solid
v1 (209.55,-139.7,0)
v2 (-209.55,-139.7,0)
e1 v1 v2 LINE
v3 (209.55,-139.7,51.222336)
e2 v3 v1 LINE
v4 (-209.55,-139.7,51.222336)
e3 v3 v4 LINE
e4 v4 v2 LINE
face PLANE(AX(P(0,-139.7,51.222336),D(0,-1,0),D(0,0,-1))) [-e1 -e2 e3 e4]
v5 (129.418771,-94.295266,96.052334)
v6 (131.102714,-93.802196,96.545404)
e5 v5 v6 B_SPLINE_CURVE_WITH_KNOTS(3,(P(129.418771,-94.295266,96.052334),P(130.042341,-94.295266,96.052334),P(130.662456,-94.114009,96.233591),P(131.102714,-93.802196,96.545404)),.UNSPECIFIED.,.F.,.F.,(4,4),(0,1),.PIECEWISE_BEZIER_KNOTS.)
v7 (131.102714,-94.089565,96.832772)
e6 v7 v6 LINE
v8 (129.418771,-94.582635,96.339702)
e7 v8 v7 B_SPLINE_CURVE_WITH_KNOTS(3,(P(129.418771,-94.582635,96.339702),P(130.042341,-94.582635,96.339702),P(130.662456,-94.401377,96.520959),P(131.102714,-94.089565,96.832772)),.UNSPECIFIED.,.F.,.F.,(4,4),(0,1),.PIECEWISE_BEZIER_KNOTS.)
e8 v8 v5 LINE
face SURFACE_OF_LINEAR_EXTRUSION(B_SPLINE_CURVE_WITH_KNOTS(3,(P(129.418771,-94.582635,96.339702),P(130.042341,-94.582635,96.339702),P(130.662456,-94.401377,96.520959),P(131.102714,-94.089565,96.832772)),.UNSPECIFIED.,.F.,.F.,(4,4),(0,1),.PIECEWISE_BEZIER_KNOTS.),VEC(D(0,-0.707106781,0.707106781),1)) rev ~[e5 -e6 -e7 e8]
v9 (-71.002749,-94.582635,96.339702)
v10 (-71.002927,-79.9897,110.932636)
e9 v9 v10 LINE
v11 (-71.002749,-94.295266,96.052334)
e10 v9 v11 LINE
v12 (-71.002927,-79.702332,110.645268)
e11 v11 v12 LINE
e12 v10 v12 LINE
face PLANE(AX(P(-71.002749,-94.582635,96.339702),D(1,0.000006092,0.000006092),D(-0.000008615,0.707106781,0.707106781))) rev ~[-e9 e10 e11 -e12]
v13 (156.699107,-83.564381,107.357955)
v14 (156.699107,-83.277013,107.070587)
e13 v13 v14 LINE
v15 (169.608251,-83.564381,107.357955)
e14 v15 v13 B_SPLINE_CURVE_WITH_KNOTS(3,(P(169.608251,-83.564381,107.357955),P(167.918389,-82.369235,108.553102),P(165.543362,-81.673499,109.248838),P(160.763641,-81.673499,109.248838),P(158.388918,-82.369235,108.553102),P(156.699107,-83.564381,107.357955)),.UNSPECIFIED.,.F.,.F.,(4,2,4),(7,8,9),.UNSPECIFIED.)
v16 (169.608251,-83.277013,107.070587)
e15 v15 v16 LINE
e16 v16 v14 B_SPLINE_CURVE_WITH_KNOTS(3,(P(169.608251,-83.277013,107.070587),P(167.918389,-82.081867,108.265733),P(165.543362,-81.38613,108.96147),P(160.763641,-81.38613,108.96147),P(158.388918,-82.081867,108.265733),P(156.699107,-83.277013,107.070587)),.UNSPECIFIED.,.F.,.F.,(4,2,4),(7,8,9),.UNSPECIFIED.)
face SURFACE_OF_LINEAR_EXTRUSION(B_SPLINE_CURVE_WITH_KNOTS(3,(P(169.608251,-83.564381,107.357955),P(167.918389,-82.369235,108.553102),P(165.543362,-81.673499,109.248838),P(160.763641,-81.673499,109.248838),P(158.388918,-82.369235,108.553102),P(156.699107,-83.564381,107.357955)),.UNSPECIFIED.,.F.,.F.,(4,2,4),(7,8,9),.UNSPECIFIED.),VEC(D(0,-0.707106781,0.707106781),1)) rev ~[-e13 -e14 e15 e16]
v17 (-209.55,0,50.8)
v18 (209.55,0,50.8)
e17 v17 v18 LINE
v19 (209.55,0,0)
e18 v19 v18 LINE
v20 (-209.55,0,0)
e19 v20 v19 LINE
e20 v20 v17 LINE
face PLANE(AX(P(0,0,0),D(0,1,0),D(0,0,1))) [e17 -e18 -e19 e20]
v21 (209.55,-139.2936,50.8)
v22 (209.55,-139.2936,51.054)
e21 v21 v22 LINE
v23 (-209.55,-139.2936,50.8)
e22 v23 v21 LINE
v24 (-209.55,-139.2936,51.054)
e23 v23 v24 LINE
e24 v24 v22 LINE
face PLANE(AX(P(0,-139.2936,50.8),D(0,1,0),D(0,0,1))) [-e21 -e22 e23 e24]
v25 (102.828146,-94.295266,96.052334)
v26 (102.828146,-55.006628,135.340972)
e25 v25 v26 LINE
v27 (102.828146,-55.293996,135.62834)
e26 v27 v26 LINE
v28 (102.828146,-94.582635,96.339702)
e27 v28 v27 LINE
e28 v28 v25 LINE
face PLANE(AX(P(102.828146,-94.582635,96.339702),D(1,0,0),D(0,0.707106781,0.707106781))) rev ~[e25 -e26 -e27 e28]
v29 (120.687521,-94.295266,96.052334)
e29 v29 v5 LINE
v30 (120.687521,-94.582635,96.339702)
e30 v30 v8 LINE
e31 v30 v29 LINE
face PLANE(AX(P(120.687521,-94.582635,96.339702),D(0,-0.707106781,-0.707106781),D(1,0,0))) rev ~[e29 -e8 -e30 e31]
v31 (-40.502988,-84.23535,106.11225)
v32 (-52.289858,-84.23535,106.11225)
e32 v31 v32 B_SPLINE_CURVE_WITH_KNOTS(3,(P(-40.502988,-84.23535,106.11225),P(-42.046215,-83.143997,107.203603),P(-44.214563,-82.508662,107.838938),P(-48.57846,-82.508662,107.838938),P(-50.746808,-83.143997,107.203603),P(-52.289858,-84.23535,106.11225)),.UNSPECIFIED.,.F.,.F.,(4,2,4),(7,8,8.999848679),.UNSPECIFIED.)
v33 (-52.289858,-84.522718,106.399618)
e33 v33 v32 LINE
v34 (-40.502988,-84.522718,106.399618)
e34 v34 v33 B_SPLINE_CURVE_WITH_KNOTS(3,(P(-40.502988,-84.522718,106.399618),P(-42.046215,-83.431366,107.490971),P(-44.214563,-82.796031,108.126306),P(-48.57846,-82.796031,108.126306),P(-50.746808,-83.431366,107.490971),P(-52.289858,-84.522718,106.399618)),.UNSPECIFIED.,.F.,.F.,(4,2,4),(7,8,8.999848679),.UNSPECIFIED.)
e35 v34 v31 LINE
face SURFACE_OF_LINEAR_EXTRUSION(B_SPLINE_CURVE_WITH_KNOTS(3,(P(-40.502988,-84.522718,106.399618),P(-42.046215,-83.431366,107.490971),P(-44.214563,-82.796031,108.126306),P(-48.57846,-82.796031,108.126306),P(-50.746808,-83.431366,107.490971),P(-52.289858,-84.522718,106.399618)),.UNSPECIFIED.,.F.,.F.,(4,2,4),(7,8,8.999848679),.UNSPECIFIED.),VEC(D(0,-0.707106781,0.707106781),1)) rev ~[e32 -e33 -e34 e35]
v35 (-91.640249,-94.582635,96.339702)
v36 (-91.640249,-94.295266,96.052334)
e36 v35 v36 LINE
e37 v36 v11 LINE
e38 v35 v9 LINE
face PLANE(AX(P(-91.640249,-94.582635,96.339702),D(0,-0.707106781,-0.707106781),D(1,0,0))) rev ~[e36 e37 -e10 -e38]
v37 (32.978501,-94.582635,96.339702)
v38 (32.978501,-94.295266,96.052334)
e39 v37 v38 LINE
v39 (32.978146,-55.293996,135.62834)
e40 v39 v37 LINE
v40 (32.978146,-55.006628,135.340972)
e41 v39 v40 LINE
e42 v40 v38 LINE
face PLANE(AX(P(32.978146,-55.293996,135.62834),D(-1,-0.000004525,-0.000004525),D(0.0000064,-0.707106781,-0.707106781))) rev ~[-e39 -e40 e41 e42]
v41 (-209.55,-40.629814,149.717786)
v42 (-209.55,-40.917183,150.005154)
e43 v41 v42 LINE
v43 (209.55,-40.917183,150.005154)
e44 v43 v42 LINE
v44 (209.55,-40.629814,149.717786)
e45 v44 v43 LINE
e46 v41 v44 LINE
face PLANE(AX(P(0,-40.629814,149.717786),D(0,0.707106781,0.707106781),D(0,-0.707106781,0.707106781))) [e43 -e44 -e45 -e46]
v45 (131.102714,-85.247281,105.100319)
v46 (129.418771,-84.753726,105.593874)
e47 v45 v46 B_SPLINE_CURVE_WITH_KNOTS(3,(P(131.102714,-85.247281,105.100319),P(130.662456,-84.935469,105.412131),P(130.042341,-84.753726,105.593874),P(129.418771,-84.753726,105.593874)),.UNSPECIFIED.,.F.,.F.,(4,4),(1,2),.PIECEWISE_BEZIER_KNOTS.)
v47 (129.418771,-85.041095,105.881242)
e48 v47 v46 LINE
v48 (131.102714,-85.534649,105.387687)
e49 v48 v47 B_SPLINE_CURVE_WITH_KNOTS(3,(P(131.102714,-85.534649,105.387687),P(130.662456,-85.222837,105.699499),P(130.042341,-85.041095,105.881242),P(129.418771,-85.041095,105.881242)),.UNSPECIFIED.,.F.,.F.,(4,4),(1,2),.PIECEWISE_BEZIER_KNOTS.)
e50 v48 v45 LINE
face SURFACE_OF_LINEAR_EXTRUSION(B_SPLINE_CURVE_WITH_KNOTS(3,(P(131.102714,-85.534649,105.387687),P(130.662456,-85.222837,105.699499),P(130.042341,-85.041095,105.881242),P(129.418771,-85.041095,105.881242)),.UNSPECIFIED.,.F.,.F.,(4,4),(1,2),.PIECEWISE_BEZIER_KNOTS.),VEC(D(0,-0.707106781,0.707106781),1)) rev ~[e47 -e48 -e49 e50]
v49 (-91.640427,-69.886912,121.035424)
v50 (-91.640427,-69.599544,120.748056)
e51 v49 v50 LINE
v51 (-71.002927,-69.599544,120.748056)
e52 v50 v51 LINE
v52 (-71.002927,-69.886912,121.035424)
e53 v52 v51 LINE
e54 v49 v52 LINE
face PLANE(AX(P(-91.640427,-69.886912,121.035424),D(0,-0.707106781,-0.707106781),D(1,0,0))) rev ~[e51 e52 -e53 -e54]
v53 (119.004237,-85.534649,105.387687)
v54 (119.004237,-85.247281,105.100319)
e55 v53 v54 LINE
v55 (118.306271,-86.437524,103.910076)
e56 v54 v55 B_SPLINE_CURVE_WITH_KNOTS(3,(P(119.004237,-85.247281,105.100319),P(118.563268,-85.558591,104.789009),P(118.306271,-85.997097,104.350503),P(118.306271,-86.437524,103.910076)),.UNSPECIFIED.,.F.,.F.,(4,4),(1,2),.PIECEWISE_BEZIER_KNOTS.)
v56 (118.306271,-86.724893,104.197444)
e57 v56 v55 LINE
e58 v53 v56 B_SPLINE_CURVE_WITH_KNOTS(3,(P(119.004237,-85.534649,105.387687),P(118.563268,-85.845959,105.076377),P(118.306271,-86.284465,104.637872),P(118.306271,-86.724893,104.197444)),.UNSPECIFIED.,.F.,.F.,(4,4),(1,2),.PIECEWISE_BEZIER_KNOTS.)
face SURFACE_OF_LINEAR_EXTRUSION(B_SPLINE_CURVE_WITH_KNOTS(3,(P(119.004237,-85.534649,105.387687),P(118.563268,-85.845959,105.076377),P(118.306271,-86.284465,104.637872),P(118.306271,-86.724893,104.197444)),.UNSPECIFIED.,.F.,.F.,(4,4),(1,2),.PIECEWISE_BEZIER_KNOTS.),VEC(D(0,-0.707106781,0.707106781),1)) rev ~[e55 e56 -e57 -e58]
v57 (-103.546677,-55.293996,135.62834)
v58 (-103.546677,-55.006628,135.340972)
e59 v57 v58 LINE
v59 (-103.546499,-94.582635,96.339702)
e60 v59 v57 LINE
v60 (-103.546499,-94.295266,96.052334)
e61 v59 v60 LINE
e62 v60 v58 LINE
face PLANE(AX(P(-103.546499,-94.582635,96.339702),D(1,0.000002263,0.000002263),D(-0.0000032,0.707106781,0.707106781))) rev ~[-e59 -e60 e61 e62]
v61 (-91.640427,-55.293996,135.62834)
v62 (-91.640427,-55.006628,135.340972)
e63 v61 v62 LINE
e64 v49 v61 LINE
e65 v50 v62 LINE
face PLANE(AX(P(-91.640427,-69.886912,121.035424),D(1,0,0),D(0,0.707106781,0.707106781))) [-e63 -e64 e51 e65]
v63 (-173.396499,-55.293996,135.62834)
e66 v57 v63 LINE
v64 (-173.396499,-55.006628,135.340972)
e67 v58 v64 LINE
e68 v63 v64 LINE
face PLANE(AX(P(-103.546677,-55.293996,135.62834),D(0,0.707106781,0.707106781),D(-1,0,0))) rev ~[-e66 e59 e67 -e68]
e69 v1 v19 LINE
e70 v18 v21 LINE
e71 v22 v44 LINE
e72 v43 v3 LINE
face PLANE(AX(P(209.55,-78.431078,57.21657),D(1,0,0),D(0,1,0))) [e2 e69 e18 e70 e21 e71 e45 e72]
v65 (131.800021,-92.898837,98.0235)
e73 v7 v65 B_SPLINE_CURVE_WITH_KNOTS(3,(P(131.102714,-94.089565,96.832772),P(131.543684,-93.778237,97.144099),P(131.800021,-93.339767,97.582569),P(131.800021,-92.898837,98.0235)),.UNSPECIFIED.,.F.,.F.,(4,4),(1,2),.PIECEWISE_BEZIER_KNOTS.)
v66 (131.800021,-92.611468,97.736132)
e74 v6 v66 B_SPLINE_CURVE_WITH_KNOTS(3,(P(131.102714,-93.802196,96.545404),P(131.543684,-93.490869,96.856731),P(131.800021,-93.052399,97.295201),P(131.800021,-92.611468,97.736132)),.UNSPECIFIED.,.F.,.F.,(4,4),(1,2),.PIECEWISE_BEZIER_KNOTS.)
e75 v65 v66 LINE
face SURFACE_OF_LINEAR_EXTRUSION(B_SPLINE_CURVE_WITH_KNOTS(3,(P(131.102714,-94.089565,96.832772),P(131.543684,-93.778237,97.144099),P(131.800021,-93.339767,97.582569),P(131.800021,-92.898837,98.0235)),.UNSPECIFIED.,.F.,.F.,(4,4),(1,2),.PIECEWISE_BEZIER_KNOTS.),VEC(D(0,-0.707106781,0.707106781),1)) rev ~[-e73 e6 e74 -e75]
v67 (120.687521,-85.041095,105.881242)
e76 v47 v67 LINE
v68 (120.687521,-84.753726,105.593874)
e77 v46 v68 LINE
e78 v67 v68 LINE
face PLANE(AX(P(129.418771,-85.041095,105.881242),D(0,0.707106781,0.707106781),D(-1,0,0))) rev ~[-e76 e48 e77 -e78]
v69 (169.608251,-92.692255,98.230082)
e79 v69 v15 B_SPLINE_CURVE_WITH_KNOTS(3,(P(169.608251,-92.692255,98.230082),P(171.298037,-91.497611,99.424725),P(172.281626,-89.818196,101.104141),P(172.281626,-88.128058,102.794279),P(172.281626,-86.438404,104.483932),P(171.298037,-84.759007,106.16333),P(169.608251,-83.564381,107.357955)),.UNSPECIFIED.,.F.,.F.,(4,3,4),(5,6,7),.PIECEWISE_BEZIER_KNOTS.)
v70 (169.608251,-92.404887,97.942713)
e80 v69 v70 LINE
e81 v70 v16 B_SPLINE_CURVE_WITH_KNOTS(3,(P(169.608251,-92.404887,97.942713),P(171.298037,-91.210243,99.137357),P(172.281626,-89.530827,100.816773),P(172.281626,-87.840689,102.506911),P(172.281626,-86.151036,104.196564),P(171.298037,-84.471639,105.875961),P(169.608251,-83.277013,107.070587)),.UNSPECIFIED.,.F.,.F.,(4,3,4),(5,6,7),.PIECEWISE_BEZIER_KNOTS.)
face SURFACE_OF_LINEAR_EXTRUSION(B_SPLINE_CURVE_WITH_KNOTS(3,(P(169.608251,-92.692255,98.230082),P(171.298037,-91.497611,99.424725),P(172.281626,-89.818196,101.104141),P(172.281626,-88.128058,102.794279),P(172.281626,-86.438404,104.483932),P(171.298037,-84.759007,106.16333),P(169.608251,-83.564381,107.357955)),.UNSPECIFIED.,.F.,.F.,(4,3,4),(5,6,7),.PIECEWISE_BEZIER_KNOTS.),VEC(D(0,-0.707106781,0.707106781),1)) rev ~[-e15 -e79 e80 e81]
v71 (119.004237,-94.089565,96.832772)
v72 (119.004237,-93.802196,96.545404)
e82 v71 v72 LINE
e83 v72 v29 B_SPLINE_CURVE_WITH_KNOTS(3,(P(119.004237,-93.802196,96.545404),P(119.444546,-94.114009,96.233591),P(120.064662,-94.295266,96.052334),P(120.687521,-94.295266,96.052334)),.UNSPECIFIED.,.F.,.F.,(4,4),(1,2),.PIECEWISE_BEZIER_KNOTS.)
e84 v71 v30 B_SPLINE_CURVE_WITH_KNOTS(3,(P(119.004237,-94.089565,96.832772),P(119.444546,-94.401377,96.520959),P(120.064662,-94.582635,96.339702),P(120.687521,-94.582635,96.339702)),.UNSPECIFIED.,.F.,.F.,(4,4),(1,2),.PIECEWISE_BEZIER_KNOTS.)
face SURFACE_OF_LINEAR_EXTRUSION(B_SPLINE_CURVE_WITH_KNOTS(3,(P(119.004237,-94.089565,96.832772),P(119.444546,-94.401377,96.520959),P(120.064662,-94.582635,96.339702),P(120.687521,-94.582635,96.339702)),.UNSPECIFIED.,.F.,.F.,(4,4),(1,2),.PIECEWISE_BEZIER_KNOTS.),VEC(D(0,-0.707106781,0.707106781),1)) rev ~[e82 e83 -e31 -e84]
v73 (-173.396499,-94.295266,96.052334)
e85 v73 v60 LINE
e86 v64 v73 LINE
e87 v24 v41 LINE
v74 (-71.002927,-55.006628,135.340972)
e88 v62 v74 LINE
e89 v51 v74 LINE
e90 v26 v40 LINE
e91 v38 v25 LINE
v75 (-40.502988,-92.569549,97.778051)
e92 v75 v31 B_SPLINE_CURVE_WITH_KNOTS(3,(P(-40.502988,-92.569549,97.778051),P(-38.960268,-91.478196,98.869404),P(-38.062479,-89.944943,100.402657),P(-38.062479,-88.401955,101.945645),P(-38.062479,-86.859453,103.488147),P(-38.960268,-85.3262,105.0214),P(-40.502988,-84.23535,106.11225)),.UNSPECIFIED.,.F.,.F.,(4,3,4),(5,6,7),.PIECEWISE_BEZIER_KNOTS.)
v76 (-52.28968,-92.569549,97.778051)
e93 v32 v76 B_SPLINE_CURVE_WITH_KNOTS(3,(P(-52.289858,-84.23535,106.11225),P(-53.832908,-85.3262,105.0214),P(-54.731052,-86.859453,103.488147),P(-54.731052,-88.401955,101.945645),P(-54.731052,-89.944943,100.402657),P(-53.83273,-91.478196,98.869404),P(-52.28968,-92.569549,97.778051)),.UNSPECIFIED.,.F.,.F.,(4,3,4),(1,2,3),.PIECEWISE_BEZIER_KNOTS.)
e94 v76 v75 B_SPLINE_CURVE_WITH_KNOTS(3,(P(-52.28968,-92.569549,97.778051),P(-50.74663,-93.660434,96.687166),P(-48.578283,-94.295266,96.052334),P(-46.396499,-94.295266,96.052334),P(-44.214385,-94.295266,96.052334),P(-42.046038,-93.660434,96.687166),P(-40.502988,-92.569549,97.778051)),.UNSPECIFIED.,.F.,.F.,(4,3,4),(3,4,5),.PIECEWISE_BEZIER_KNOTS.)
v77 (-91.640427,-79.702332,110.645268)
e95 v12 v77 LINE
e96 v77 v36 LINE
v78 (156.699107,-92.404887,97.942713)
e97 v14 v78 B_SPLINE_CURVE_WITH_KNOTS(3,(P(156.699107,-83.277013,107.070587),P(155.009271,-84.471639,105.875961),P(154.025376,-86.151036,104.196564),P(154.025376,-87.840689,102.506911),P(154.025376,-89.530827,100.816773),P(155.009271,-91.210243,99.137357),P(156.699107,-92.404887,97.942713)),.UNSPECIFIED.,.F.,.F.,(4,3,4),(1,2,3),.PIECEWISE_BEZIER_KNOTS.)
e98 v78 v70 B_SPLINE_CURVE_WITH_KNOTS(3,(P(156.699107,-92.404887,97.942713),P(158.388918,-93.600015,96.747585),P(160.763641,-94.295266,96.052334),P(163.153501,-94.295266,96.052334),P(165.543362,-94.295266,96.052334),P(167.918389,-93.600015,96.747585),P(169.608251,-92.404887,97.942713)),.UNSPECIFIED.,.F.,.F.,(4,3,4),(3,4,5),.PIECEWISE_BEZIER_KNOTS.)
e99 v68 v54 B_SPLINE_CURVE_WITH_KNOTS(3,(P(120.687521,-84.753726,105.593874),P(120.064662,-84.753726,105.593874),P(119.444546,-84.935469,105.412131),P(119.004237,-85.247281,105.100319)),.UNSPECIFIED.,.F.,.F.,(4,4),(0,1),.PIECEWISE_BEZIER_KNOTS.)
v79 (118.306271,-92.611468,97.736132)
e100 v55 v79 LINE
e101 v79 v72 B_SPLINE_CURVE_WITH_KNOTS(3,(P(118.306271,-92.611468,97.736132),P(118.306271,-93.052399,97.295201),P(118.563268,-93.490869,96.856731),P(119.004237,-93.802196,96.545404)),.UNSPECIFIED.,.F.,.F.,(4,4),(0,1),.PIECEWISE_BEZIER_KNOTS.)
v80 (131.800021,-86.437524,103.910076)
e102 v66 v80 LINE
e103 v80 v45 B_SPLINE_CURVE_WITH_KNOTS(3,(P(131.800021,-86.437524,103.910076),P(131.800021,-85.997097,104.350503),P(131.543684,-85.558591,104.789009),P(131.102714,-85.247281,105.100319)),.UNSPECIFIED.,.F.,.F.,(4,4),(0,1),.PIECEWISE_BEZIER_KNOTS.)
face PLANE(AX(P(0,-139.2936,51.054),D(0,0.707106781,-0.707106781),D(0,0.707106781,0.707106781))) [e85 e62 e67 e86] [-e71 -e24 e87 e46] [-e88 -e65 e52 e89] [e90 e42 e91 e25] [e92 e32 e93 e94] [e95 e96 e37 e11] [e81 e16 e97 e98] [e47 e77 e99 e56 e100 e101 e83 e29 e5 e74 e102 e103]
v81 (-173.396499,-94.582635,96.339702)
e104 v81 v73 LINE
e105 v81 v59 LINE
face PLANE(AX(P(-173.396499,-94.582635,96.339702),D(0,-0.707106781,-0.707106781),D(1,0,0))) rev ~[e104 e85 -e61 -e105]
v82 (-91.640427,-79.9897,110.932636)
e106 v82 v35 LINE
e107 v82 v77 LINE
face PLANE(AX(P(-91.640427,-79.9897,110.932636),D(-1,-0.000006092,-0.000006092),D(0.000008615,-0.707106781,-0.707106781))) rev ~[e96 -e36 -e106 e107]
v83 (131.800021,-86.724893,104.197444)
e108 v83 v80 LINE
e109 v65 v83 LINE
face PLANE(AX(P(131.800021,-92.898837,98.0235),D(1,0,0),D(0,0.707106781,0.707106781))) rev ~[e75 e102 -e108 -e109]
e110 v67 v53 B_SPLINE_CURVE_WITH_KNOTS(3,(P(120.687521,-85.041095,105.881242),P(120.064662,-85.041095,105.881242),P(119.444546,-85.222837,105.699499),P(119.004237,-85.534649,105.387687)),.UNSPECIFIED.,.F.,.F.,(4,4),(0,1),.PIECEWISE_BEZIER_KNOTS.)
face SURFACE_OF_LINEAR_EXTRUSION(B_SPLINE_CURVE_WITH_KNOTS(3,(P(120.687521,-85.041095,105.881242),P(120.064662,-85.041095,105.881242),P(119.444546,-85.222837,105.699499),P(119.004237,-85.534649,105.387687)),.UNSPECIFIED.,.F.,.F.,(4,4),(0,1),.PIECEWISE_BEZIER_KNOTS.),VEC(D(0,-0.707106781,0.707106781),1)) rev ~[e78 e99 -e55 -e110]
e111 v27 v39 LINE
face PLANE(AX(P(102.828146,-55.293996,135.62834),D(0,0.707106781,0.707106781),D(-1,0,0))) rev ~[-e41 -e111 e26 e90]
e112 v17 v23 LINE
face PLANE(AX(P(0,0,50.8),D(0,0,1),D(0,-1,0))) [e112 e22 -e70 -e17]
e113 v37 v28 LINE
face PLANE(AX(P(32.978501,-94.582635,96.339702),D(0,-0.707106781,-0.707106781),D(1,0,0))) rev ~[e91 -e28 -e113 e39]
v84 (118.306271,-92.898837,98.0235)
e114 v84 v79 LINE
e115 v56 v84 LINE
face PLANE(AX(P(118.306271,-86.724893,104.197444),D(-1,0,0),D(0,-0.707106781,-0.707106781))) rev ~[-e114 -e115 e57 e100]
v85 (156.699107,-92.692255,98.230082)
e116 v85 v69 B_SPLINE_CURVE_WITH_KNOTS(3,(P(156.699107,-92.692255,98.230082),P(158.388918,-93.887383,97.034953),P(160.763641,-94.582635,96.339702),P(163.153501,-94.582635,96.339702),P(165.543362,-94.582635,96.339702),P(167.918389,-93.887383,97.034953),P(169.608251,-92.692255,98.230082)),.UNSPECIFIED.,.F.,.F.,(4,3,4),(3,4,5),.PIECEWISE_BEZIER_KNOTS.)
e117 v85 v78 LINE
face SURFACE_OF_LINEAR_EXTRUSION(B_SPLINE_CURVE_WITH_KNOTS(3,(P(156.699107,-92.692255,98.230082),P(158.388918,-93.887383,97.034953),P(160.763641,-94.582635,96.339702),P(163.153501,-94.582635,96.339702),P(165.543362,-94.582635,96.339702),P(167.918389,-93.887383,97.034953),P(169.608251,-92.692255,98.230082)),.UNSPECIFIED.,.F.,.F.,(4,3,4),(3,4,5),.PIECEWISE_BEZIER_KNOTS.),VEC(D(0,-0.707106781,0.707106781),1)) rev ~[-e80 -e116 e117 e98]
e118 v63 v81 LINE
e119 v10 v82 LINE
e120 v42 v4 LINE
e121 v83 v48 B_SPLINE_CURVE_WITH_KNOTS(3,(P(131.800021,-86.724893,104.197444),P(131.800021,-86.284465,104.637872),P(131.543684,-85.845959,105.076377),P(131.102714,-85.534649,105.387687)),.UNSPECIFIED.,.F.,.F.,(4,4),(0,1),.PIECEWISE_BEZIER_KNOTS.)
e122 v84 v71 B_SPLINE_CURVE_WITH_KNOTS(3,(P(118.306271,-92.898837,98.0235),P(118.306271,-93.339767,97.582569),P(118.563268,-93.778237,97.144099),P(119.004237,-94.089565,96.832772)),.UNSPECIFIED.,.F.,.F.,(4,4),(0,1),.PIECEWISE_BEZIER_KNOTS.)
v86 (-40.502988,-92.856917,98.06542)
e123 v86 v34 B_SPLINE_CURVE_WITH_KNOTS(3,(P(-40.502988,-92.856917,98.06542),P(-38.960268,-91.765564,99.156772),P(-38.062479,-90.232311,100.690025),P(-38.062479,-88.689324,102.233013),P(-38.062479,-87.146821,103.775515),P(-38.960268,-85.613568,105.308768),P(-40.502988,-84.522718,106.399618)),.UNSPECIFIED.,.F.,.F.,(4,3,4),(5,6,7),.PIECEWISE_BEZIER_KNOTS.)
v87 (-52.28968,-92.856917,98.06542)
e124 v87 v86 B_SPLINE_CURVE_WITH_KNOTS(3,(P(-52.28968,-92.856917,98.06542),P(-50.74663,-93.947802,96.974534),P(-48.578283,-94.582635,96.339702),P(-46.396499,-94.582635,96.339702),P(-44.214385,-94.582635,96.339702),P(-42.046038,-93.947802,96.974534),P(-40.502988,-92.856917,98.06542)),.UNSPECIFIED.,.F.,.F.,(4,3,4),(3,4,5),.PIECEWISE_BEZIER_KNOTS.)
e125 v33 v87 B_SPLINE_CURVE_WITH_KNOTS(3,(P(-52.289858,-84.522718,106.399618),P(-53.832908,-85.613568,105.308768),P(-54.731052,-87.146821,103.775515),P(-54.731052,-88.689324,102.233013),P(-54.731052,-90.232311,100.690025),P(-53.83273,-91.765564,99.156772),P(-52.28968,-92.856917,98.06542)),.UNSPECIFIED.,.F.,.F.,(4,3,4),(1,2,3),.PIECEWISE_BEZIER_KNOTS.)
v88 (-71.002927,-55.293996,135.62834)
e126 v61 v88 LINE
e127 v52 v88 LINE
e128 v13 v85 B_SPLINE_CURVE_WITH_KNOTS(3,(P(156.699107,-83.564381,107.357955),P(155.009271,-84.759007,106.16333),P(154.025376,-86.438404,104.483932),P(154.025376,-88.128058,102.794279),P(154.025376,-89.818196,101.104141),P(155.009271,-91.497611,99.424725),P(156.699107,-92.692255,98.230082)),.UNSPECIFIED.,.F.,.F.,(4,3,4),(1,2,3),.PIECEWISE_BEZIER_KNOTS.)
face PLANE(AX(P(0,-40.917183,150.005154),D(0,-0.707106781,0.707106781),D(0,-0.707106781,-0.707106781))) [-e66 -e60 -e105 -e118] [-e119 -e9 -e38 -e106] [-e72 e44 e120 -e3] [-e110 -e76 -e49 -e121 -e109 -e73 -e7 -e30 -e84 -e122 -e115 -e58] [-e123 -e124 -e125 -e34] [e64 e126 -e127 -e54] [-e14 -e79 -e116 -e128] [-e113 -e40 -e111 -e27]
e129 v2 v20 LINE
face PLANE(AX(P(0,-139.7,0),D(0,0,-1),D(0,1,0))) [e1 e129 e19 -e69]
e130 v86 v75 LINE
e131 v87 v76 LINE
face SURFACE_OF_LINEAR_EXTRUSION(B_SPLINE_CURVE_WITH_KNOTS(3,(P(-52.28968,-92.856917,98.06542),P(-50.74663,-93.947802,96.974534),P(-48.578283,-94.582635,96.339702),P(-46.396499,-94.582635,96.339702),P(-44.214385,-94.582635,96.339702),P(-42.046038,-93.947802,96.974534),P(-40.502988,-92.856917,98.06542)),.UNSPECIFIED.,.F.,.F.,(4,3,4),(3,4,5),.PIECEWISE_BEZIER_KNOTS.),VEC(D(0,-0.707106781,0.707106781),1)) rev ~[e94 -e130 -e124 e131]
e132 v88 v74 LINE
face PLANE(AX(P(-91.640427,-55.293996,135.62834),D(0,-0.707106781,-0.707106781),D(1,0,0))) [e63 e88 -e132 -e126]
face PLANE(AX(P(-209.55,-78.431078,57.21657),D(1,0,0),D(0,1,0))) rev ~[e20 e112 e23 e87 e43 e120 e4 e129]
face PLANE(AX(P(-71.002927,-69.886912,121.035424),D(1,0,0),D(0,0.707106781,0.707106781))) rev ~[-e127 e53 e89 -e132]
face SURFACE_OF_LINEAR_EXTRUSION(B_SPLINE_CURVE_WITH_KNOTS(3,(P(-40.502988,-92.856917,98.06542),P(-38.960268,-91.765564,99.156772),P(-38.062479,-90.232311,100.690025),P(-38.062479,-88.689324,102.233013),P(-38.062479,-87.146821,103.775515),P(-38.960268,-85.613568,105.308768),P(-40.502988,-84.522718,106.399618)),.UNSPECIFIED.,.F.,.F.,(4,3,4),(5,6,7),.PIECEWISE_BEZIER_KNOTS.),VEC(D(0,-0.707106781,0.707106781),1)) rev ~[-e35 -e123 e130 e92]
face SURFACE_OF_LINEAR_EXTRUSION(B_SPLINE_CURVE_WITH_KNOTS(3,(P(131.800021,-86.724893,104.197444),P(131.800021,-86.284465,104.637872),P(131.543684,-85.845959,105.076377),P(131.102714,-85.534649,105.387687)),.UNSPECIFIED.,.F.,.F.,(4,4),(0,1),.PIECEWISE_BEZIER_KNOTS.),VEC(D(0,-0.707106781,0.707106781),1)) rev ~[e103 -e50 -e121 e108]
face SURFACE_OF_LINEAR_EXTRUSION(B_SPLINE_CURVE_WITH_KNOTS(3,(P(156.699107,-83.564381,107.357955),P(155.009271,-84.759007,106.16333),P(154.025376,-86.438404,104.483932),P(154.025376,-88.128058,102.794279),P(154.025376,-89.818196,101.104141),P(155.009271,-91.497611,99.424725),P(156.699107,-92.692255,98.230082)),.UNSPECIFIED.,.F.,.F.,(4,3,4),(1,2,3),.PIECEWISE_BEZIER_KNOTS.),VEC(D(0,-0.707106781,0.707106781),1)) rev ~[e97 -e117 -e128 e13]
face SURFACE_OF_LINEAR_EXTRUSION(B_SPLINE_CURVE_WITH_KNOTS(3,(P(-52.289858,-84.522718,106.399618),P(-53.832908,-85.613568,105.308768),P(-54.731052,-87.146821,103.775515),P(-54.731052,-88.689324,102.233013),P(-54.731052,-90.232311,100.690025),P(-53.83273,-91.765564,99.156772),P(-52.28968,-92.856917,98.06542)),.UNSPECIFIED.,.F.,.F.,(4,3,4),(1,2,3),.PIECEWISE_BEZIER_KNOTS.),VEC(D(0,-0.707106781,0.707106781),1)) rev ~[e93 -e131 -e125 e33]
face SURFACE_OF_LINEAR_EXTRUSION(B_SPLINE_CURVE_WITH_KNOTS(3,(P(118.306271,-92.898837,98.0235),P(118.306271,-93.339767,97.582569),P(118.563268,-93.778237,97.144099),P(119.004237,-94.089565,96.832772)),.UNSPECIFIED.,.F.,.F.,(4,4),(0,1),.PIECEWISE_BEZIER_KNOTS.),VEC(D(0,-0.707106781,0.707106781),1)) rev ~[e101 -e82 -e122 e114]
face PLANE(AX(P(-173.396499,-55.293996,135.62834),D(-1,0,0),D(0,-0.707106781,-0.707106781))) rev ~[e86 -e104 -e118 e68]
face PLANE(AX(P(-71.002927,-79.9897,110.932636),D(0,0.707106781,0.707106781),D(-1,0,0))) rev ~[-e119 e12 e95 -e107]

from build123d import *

# Parameters (mm, degrees)
F1_DEPTH = 209.55
F2_W     = 20.6375
F2_H     = 20.6375
F3_DEPTH = 0.4064


# Not quite as in the source:
# - the dataset's text gives a spline's control points without its knots; the knots are read off the source's solid


with BuildPart() as f1:
    # F0 (on Right) → F1 (new body, symmetric)
    with BuildSketch(Plane.YZ):
        Polygon((-139.7, 0), (0, 0), (0, 50.8), (-139.2936, 50.8), (-139.2936, 51.054), (-40.6298144724, 149.7177855276), (-40.9171826682, 150.0051537235), (-139.7, 51.2223363917), align=None)
    extrude(amount=F1_DEPTH, both=True)

    # F2 (on face) → F3 (cut, through all)
    with BuildSketch(Plane(origin=(0, -95.4611681959, 95.4611681959), x_dir=(1, 0, 0), z_dir=(0, -0.7071067812, 0.7071067812))):
        with BuildLine():
            add(Edge.make_bspline(
                [(119.0042372245, 14.038217476), (118.5632678245, 13.597959276), (118.3062706245, 12.977818276), (118.3062706245, 12.354959476)],
                knots=[1, 1, 1, 1, 2, 2, 2, 2], degree=3))
            Line((118.3062706245, 12.354959476), (118.3062706245, 3.623684076))
            add(Edge.make_bspline(
                [(118.3062706245, 3.623684076), (118.3062706245, 3.000114076), (118.5632678245, 2.380023876), (119.0042372245, 1.939740276)],
                knots=[0, 0, 0, 0, 1, 1, 1, 1], degree=3))
            add(Edge.make_bspline(
                [(119.0042372245, 1.939740276), (119.4445462245, 1.498770876), (120.0646618245, 1.242434076), (120.6875206245, 1.242434076)],
                knots=[1, 1, 1, 1, 2, 2, 2, 2], degree=3))
            Line((120.6875206245, 1.242434076), (129.4187706245, 1.242434076))
            add(Edge.make_bspline(
                [(129.4187706245, 1.242434076), (130.0423406245, 1.242434076), (130.6624562245, 1.498770876), (131.1027144245, 1.939740276)],
                knots=[0, 0, 0, 0, 1, 1, 1, 1], degree=3))
            add(Edge.make_bspline(
                [(131.1027144245, 1.939740276), (131.5436838245, 2.380023876), (131.8000206245, 3.000114076), (131.8000206245, 3.623684076)],
                knots=[1, 1, 1, 1, 2, 2, 2, 2], degree=3))
            Line((131.8000206245, 3.623684076), (131.8000206245, 12.354959476))
            add(Edge.make_bspline(
                [(131.8000206245, 12.354959476), (131.8000206245, 12.977818276), (131.5436838245, 13.597959276), (131.1027144245, 14.038217476)],
                knots=[0, 0, 0, 0, 1, 1, 1, 1], degree=3))
            add(Edge.make_bspline(
                [(131.1027144245, 14.038217476), (130.6624562245, 14.479186876), (130.0423406245, 14.736209476), (129.4187706245, 14.736209476)],
                knots=[1, 1, 1, 1, 2, 2, 2, 2], degree=3))
            Line((129.4187706245, 14.736209476), (120.6875206245, 14.736209476))
            add(Edge.make_bspline(
                [(120.6875206245, 14.736209476), (120.0646618245, 14.736209476), (119.4445462245, 14.479186876), (119.0042372245, 14.038217476)],
                knots=[0, 0, 0, 0, 1, 1, 1, 1], degree=3))
        make_face()
        Polygon((-173.3964987755, 56.804959476), (-173.3964987755, 1.242434076), (-103.5464987755, 1.242434076), (-103.5466765755, 56.804959476), align=None)
        Polygon((-91.6402487755, 1.242434076), (-71.0027487755, 1.242434076), (-71.0029265755, 21.879959476), (-91.6404265755, 21.879959476), align=None)
        with Locations((-81.3216765755, 46.486209476)):
            Rectangle(F2_W, F2_H)
        Polygon((32.9785012245, 1.242434076), (102.8281456245, 1.242434076), (102.8281456245, 56.804959476), (32.9781456245, 56.804959476), align=None)
        with BuildLine():
            add(Edge.make_bspline(
                [(-40.5029875755, 15.469304276), (-42.0462153755, 17.012709876), (-44.2145625755, 17.911209476), (-46.3966765755, 17.911209476)],
                knots=[7, 7, 7, 7, 8, 8, 8, 8], degree=3))
            add(Edge.make_bspline(
                [(-46.3966765755, 17.911209476), (-48.5784603755, 17.911209476), (-50.7468075755, 17.012709876), (-52.2898575755, 15.469304276)],
                knots=[0, 0, 0, 0, 1, 1, 1, 1], degree=3))
            add(Edge.make_bspline(
                [(-52.2898575755, 15.469304276), (-53.8329075755, 13.926609876), (-54.7310515755, 11.758262676), (-54.7310515755, 9.576834476), (-54.7310515755, 7.394720476), (-53.8327297755, 5.226373276), (-52.2896797755, 3.682967676)],
                knots=[1, 1, 1, 1, 2, 2, 2, 3, 3, 3, 3], degree=3))
            add(Edge.make_bspline(
                [(-52.2896797755, 3.682967676), (-50.7466297755, 2.140222476), (-48.5782825755, 1.242434076), (-46.3964987755, 1.242434076), (-44.2143847755, 1.242434076), (-42.0460375755, 2.140222476), (-40.5029875755, 3.682967676)],
                knots=[3, 3, 3, 3, 4, 4, 4, 5, 5, 5, 5], degree=3))
            add(Edge.make_bspline(
                [(-40.5029875755, 3.682967676), (-38.9602677755, 5.226373276), (-38.0624793755, 7.394720476), (-38.0624793755, 9.576834476), (-38.0624793755, 11.758262676), (-38.9602677755, 13.926609876), (-40.5029875755, 15.469304276)],
                knots=[5, 5, 5, 5, 6, 6, 6, 7, 7, 7, 7], degree=3))
        make_face()
        with BuildLine():
            add(Edge.make_bspline(
                [(169.6082508245, 16.824597476), (167.9183888245, 18.514789676), (165.5433618245, 19.498709476), (163.1535012245, 19.498709476)],
                knots=[7, 7, 7, 7, 8, 8, 8, 8], degree=3))
            add(Edge.make_bspline(
                [(163.1535012245, 19.498709476), (160.7636406245, 19.498709476), (158.3889184245, 18.514789676), (156.6991072245, 16.824597476)],
                knots=[0, 0, 0, 0, 1, 1, 1, 1], degree=3))
            add(Edge.make_bspline(
                [(156.6991072245, 16.824597476), (155.0092706245, 15.135141876), (154.0253762245, 12.760114876), (154.0253762245, 10.370584476), (154.0253762245, 7.980368276), (155.0092706245, 5.605315876), (156.6991072245, 3.915834876)],
                knots=[1, 1, 1, 1, 2, 2, 2, 3, 3, 3, 3], degree=3))
            add(Edge.make_bspline(
                [(156.6991072245, 3.915834876), (158.3889184245, 2.225668076), (160.7636406245, 1.242434076), (163.1535012245, 1.242434076), (165.5433618245, 1.242434076), (167.9183888245, 2.225668076), (169.6082508245, 3.915834876)],
                knots=[3, 3, 3, 3, 4, 4, 4, 5, 5, 5, 5], degree=3))
            add(Edge.make_bspline(
                [(169.6082508245, 3.915834876), (171.2980366245, 5.605315876), (172.2816262245, 7.980368276), (172.2816262245, 10.370584476), (172.2816262245, 12.760114876), (171.2980366245, 15.135141876), (169.6082508245, 16.824597476)],
                knots=[5, 5, 5, 5, 6, 6, 6, 7, 7, 7, 7], degree=3))
        make_face()
    extrude(amount=-F3_DEPTH, mode=Mode.SUBTRACT)


solid = f1.part
